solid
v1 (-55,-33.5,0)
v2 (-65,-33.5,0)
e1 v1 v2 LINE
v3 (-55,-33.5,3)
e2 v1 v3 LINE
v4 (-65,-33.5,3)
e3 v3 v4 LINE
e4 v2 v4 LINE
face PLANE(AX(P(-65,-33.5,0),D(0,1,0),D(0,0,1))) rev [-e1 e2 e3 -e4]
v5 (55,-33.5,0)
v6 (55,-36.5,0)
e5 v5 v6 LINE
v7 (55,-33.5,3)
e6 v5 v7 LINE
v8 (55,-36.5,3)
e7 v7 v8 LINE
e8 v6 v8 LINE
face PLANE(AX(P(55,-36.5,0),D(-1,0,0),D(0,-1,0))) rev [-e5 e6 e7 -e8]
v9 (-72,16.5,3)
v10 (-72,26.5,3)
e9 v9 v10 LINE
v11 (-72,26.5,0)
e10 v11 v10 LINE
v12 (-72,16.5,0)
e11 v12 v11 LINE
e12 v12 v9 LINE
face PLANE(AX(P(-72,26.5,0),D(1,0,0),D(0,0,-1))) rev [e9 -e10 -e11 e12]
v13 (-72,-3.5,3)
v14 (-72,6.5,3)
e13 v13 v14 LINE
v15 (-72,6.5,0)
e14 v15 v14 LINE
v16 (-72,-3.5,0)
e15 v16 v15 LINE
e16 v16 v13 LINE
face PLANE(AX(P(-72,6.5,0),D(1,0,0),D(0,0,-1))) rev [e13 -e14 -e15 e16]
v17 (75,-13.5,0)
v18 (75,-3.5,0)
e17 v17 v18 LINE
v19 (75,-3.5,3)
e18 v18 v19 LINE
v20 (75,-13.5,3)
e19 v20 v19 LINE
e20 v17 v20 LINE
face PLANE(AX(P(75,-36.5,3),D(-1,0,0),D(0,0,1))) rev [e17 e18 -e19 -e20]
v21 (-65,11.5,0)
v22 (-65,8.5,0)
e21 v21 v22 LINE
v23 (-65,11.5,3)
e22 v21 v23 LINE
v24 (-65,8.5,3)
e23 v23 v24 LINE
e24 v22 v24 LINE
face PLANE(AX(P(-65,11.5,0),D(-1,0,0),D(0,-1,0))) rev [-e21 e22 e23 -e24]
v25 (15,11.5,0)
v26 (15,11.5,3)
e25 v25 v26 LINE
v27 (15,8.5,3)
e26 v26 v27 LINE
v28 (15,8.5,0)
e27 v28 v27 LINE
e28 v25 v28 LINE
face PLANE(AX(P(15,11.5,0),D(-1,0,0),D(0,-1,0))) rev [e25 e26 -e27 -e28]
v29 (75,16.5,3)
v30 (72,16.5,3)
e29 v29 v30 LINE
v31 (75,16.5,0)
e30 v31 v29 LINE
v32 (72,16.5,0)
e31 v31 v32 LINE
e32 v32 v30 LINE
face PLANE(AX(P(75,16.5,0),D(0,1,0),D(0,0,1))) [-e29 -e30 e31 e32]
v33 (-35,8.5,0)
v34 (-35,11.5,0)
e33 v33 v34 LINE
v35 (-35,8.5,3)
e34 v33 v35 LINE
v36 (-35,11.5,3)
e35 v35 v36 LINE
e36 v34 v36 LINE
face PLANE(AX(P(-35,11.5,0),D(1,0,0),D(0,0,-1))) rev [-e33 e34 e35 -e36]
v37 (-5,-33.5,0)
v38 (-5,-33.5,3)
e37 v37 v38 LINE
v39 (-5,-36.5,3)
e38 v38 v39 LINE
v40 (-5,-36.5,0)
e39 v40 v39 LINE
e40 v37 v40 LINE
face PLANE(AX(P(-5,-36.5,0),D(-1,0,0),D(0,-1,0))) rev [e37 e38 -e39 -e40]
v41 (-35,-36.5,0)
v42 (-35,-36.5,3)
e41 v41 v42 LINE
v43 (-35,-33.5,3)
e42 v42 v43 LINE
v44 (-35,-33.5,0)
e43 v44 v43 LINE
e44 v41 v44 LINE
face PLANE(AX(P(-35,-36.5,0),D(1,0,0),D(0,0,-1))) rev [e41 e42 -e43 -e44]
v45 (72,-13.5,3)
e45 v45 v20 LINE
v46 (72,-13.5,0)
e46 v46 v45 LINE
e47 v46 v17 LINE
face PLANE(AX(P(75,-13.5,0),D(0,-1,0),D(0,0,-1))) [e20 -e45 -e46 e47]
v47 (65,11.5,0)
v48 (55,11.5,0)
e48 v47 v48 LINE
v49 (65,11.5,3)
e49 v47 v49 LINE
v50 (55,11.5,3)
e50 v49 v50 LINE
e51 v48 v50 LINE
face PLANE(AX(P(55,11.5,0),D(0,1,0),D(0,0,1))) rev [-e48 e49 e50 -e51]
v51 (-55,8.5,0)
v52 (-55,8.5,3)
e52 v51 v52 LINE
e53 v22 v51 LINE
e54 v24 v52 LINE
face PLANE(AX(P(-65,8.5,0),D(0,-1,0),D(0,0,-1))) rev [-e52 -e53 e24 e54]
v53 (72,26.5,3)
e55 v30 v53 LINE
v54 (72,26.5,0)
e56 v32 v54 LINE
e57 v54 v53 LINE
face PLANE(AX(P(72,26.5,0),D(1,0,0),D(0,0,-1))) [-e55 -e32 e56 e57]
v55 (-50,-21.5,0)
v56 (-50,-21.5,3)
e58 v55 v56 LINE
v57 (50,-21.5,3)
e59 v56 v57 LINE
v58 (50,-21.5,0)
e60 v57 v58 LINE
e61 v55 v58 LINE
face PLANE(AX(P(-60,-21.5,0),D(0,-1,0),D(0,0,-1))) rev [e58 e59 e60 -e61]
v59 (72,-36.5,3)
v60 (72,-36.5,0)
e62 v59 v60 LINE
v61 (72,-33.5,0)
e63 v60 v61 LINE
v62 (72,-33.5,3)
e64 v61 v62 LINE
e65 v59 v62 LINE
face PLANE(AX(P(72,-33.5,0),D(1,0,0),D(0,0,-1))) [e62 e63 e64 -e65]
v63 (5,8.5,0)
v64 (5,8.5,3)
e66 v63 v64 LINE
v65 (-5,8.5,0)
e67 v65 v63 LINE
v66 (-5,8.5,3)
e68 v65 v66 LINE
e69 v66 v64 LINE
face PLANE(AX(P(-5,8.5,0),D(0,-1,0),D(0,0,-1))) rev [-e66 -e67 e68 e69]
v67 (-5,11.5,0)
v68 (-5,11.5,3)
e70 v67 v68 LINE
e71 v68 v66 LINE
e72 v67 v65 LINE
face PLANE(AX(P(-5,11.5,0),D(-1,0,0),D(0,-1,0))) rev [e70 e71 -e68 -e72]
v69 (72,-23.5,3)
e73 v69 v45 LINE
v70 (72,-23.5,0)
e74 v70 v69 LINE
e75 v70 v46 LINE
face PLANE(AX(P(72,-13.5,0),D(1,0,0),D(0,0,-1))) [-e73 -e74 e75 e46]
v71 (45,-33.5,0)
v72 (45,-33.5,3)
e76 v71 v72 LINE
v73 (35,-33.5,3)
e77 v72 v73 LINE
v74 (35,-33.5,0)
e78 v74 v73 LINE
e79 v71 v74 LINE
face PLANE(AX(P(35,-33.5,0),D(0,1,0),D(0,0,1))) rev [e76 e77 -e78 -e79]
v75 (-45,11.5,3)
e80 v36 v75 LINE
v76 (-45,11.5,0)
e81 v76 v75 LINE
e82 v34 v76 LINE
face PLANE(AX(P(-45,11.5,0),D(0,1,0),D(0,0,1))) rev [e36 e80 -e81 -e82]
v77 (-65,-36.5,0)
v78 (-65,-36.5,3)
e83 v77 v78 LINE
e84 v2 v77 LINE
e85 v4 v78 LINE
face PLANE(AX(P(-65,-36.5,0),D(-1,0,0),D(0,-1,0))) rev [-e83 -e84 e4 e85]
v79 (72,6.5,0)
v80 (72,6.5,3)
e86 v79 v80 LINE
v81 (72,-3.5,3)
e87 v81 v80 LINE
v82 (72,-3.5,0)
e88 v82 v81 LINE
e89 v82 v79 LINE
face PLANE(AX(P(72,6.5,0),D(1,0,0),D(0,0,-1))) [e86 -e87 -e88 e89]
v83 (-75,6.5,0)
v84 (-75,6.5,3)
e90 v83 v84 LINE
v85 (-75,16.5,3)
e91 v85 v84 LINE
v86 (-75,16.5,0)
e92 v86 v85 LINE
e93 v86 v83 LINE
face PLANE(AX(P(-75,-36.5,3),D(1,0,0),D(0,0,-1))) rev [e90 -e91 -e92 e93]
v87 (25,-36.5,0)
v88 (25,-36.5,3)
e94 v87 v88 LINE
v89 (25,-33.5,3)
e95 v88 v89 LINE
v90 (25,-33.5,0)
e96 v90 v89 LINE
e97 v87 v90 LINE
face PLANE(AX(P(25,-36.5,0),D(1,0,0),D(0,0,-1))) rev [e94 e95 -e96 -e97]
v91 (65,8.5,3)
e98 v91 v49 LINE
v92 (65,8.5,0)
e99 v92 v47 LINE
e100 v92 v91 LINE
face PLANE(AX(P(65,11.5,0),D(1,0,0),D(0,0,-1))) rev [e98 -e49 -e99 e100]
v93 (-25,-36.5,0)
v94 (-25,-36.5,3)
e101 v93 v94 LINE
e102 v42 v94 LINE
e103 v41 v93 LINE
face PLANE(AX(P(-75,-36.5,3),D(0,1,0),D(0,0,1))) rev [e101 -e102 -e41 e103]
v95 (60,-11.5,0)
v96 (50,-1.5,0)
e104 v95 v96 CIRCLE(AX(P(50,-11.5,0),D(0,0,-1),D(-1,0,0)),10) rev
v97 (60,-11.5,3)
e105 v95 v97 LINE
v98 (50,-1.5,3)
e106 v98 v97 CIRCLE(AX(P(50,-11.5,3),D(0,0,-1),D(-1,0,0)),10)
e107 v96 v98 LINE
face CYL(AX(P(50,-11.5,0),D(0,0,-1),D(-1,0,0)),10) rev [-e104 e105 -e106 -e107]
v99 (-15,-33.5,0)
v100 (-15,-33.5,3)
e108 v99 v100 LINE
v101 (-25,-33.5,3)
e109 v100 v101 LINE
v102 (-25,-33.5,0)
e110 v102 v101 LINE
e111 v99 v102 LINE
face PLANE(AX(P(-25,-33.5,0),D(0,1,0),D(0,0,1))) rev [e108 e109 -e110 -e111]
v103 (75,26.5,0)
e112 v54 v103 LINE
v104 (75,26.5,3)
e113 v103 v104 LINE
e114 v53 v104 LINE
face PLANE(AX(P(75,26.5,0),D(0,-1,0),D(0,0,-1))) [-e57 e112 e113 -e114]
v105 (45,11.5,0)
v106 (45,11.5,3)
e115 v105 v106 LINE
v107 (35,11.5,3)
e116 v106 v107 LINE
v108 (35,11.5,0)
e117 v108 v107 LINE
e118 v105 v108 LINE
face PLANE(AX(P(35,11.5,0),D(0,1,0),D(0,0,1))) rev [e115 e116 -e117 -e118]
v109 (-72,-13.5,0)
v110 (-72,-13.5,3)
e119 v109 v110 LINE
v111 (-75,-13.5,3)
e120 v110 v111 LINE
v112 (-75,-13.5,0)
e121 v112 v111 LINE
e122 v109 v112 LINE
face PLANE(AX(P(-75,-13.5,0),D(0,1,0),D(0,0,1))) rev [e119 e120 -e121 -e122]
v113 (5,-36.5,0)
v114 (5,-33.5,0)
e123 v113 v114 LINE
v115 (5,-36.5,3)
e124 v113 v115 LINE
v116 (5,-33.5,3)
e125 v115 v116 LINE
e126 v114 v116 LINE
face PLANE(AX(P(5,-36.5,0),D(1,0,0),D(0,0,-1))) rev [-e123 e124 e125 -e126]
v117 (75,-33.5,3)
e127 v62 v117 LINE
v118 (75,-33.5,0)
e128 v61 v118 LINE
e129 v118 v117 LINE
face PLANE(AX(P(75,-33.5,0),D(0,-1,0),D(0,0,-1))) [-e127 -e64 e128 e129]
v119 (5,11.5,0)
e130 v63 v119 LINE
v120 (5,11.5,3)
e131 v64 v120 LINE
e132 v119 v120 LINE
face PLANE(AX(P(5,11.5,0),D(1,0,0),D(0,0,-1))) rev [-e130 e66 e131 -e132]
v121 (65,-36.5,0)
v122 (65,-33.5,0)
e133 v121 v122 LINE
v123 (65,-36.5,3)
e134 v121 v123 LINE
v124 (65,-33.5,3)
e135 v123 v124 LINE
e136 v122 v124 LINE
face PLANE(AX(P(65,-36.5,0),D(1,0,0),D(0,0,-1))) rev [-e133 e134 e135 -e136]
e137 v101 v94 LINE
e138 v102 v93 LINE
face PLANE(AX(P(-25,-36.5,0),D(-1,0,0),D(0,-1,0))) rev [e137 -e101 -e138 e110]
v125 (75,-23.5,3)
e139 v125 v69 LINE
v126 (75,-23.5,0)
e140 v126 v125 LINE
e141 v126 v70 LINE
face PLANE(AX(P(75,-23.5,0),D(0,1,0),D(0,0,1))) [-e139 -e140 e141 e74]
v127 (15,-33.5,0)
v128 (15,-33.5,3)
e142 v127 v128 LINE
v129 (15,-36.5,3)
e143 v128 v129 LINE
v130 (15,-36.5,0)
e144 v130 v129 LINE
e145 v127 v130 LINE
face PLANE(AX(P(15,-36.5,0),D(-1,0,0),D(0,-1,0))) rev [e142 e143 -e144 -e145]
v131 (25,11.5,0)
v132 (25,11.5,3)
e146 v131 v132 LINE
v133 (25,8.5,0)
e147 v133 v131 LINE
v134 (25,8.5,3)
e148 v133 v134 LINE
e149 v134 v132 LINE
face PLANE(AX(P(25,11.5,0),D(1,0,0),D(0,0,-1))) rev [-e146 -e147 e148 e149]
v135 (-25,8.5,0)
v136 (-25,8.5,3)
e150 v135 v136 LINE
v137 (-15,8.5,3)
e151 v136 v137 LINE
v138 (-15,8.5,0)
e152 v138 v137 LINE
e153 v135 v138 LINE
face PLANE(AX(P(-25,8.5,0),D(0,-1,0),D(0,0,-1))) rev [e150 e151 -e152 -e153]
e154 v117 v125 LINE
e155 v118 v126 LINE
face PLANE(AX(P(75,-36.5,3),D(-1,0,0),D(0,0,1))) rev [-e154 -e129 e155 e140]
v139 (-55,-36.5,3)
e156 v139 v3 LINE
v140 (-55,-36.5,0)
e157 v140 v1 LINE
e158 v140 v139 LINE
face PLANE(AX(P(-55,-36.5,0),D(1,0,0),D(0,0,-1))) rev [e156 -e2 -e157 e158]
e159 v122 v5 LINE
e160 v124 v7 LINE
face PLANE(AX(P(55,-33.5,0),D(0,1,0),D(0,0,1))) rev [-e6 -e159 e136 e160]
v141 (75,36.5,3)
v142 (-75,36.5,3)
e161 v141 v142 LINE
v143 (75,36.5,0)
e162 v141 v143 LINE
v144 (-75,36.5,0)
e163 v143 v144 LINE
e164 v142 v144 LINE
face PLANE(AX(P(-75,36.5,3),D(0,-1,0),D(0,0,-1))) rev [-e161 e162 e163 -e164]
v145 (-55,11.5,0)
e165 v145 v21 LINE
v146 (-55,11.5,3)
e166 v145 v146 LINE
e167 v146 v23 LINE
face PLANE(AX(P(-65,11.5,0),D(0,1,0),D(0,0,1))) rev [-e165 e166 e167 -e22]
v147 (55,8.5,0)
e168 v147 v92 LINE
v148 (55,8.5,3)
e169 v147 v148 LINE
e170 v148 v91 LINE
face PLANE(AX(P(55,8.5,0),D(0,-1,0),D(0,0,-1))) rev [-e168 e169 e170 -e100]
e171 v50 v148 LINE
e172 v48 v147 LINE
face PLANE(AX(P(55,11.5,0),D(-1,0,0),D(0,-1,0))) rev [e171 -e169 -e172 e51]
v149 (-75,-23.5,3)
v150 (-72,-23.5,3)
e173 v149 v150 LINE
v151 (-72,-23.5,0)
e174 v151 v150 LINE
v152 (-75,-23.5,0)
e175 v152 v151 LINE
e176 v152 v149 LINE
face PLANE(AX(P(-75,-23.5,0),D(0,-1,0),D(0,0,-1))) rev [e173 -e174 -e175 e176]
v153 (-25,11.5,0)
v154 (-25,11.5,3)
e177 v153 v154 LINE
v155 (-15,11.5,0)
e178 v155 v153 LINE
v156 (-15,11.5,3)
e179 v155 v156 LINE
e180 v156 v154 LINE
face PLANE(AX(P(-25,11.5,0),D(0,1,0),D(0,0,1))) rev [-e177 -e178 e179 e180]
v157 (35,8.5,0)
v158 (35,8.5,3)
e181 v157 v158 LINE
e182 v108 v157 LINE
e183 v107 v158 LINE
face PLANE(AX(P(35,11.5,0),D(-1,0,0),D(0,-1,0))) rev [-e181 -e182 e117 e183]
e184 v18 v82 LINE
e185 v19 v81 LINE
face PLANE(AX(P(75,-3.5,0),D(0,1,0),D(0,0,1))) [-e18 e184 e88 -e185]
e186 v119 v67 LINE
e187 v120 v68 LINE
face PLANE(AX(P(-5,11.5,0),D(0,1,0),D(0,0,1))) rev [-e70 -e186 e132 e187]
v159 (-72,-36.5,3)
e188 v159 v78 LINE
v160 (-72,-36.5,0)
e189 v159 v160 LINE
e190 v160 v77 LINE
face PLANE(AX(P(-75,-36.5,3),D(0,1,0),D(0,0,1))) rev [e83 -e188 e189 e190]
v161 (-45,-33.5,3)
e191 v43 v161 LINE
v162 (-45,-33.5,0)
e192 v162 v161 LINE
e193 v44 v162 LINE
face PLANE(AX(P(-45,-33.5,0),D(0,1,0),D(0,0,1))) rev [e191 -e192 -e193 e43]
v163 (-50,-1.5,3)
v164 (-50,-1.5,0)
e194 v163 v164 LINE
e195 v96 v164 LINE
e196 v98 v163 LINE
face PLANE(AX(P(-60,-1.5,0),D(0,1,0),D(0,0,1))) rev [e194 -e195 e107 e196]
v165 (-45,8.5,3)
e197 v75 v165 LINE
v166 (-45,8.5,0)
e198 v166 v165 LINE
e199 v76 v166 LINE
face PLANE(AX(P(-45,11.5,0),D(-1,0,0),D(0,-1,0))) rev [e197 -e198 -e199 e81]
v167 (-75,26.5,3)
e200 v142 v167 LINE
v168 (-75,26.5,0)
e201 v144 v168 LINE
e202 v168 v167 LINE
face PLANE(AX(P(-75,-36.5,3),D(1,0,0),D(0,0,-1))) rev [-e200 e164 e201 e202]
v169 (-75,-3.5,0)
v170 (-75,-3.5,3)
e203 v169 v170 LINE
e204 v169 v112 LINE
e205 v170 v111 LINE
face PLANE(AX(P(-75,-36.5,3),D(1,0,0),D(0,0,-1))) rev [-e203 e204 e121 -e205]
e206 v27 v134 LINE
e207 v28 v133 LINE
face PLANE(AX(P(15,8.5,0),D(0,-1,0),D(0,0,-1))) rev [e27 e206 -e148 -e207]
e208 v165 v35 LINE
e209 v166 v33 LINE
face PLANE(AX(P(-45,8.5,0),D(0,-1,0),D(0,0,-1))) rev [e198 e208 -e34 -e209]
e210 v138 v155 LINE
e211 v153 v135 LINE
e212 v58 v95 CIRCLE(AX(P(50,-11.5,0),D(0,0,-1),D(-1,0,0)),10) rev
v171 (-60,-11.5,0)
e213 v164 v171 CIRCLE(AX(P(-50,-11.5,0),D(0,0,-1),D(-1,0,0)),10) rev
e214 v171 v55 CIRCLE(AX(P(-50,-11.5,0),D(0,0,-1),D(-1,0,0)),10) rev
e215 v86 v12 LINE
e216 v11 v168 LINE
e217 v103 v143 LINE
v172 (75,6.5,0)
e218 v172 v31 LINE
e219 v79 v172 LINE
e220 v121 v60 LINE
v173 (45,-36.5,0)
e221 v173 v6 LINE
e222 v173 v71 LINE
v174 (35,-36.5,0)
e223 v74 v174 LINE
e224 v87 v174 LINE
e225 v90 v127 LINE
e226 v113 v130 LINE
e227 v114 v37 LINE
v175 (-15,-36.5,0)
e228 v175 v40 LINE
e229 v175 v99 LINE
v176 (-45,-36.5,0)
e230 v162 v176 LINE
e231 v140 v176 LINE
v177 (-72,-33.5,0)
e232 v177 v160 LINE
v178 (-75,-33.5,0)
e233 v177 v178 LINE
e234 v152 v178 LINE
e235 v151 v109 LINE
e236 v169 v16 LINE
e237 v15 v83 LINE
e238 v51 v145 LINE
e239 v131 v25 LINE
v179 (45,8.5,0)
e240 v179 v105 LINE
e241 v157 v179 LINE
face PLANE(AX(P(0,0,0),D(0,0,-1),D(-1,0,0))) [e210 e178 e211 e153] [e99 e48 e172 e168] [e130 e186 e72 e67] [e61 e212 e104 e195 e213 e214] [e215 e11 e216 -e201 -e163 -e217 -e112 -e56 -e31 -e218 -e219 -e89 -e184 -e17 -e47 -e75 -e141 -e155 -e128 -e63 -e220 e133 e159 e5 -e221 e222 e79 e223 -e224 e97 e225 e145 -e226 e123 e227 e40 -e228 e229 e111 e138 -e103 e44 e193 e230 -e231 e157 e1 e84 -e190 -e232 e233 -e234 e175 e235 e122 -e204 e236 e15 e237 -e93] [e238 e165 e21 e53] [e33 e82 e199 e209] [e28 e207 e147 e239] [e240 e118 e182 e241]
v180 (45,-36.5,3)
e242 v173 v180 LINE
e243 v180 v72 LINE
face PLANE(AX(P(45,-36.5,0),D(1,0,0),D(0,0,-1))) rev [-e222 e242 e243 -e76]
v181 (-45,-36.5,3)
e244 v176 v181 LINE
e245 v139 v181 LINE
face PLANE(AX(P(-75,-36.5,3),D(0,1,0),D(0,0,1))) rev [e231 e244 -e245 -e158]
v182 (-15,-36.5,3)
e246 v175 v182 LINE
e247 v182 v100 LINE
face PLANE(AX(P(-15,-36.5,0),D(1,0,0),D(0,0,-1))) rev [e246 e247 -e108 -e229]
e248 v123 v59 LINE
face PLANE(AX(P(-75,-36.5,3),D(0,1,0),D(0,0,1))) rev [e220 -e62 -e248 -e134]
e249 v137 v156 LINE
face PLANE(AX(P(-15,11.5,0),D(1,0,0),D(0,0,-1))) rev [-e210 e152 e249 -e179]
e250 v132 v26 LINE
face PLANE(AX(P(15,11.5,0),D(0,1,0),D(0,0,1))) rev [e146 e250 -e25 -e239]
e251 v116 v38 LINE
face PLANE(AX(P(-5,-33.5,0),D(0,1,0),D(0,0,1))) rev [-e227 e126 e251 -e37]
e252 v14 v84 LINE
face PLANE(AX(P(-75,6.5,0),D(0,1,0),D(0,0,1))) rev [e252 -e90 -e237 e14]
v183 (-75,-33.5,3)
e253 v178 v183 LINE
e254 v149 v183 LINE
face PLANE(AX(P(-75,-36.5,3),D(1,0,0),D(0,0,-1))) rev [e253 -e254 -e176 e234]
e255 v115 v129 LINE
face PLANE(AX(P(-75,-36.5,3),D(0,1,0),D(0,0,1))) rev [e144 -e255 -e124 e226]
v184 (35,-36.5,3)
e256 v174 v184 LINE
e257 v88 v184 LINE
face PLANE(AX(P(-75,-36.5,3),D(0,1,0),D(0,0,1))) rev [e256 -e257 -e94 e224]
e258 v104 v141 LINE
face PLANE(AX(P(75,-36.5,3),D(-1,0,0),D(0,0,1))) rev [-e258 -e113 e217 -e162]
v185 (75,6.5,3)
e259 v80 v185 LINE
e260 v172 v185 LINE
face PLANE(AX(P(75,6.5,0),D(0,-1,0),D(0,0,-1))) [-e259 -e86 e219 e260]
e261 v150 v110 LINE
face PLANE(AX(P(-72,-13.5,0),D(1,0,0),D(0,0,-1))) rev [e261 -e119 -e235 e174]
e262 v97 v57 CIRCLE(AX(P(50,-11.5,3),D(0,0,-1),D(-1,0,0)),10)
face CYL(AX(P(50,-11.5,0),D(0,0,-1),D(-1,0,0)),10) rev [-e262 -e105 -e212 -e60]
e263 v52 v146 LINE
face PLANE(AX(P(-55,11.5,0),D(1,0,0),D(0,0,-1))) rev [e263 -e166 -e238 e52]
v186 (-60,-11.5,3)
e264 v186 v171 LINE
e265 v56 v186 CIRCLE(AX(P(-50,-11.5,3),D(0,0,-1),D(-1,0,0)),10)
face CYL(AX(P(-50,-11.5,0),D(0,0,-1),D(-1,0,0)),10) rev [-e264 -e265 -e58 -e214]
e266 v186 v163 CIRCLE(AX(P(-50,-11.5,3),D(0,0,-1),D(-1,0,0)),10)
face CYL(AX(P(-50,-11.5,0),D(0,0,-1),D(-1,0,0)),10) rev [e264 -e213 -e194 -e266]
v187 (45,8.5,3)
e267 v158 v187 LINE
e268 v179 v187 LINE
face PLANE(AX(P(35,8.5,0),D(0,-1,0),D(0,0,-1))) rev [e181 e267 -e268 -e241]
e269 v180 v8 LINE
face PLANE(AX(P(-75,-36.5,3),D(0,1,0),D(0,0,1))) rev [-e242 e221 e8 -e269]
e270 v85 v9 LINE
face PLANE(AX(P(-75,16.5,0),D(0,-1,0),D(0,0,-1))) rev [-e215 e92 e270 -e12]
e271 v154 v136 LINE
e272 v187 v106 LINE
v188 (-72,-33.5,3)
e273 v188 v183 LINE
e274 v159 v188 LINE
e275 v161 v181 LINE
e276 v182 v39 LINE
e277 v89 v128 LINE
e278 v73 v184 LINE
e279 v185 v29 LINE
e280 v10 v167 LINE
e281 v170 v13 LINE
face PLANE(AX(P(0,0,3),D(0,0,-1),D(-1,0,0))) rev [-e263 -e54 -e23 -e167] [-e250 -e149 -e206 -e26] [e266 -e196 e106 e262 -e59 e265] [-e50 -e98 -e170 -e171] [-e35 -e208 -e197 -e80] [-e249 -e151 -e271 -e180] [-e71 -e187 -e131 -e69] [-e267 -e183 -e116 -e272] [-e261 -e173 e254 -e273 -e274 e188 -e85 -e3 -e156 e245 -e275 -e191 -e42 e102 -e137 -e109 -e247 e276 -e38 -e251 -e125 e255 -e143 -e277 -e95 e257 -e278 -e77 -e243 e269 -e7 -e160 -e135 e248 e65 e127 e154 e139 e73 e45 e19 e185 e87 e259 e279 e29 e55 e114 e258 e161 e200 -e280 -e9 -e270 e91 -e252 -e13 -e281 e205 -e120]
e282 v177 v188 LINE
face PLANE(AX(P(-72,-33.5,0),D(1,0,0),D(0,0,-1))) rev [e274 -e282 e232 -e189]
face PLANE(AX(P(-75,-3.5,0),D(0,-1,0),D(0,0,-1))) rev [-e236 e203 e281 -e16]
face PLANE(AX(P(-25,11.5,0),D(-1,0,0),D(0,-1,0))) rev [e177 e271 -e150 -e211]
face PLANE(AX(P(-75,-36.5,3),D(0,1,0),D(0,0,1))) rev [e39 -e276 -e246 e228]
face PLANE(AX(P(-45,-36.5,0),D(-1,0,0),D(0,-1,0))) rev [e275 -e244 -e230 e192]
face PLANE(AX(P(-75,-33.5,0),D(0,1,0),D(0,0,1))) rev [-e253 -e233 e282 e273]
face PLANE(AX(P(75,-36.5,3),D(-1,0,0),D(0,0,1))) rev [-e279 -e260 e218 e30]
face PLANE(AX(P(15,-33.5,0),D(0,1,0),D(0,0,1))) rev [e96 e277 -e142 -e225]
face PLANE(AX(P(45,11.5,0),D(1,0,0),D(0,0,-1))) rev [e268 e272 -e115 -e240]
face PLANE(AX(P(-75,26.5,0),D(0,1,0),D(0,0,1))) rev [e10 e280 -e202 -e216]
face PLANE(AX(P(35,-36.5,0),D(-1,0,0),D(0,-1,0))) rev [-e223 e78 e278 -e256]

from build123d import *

# Parameters (mm, degrees)
SKETCH1_W               = 150
SKETCH1_H               = 73
BOSS_EXTRUDE1_DEPTH     = 3
SKETCH2_W               = 3
SKETCH2_H               = 10
CUT_EXTRUDE1_DEPTH      = 84.464064123
LPATTERN1_COUNT         = 4
LPATTERN1_PITCH         = 20
MIRROR3_COPY_1_SKETCH_W = 3
MIRROR3_COPY_1_SKETCH_H = 10
MIRROR3_COPY_1_DEPTH    = 84.464064123
MIRROR3_COPY_2_SKETCH_W = 3
MIRROR3_COPY_2_SKETCH_H = 10
MIRROR3_COPY_2_DEPTH    = 84.464064123
MIRROR3_COPY_3_SKETCH_W = 3
MIRROR3_COPY_3_SKETCH_H = 10
MIRROR3_COPY_3_DEPTH    = 84.464064123
SKETCH4_W               = 10
SKETCH4_H               = 3
CUT_EXTRUDE3_DEPTH      = 84.464064123
LPATTERN2_COUNT         = 8
LPATTERN2_PITCH         = 20
SKETCH5_W               = 10
SKETCH5_H               = 3
CUT_EXTRUDE4_DEPTH      = 84.464064123
LPATTERN4_COUNT         = 7
LPATTERN4_PITCH         = 20
SKETCH6_W               = 120
SKETCH6_H               = 20
CUT_EXTRUDE5_DEPTH      = 84.464064123
FILLET1_R               = 10


with BuildPart() as part:
    # Sketch1 → Boss-Extrude1 (new body)
    with BuildSketch(Plane.XY):
        Rectangle(SKETCH1_W, SKETCH1_H)
    extrude(amount=BOSS_EXTRUDE1_DEPTH)

    # Sketch2 → Cut-Extrude1 (cut, through all)
    with BuildSketch(Plane.XY.offset(3)):
        with Locations((-73.5, 21.5)):
            Rectangle(SKETCH2_W, SKETCH2_H)
    cut_extrude1 = extrude(amount=-CUT_EXTRUDE1_DEPTH, mode=Mode.SUBTRACT)

    # LPattern1: Cut-Extrude1 ×4
    with Locations(*[(0, -i * LPATTERN1_PITCH, 0) for i in range(1, LPATTERN1_COUNT)]):
        add(cut_extrude1, mode=Mode.SUBTRACT)

    # Mirror3: Cut-Extrude1 across plane
    add(cut_extrude1.mirror(Plane(origin=(0, 0, 0), x_dir=(0, 0, 1), z_dir=(1, 0, 0))), mode=Mode.SUBTRACT)

    # Mirror3 copy 1 sketch → Mirror3 copy 1 (cut, through all)
    with BuildSketch(Plane(origin=(0, -20, 3), x_dir=(-1, 0, 0), z_dir=(0, 0, 1))):
        with Locations((-73.5, -21.5)):
            Rectangle(MIRROR3_COPY_1_SKETCH_W, MIRROR3_COPY_1_SKETCH_H)
    extrude(amount=-MIRROR3_COPY_1_DEPTH, mode=Mode.SUBTRACT)

    # Mirror3 copy 2 sketch → Mirror3 copy 2 (cut, through all)
    with BuildSketch(Plane(origin=(0, -40, 3), x_dir=(-1, 0, 0), z_dir=(0, 0, 1))):
        with Locations((-73.5, -21.5)):
            Rectangle(MIRROR3_COPY_2_SKETCH_W, MIRROR3_COPY_2_SKETCH_H)
    extrude(amount=-MIRROR3_COPY_2_DEPTH, mode=Mode.SUBTRACT)

    # Mirror3 copy 3 sketch → Mirror3 copy 3 (cut, through all)
    with BuildSketch(Plane(origin=(0, -60, 3), x_dir=(-1, 0, 0), z_dir=(0, 0, 1))):
        with Locations((-73.5, -21.5)):
            Rectangle(MIRROR3_COPY_3_SKETCH_W, MIRROR3_COPY_3_SKETCH_H)
    extrude(amount=-MIRROR3_COPY_3_DEPTH, mode=Mode.SUBTRACT)

    # Sketch4 → Cut-Extrude3 (cut, through all)
    with BuildSketch(Plane.XY.offset(3)):
        with Locations((60, -35)):
            Rectangle(SKETCH4_W, SKETCH4_H)
    cut_extrude3 = extrude(amount=-CUT_EXTRUDE3_DEPTH, mode=Mode.SUBTRACT)

    # LPattern2: Cut-Extrude3 ×8
    with Locations(*[(-i * LPATTERN2_PITCH, 0, 0) for i in range(1, LPATTERN2_COUNT)]):
        add(cut_extrude3, mode=Mode.SUBTRACT)

    # Sketch5 → Cut-Extrude4 (cut, through all)
    with BuildSketch(Plane.XY.offset(3)):
        with Locations((-60, 10)):
            Rectangle(SKETCH5_W, SKETCH5_H)
    cut_extrude4 = extrude(amount=-CUT_EXTRUDE4_DEPTH, mode=Mode.SUBTRACT)

    # LPattern4: Cut-Extrude4 ×7
    with Locations(*[(i * LPATTERN4_PITCH, 0, 0) for i in range(1, LPATTERN4_COUNT)]):
        add(cut_extrude4, mode=Mode.SUBTRACT)

    # Sketch6 → Cut-Extrude5 (cut, through all)
    with BuildSketch(Plane.XY.offset(3)):
        with Locations((0, -11.5)):
            Rectangle(SKETCH6_W, SKETCH6_H)
    extrude(amount=-CUT_EXTRUDE5_DEPTH, mode=Mode.SUBTRACT)

    # Fillet1
    fillet1_edges = [part.edges().sort_by_distance(p)[0] for p in [
        (60, -1.5, 1.5),
        (60, -21.5, 1.5),
        (-60, -1.5, 1.5),
        (-60, -21.5, 1.5),
    ]]
    fillet(fillet1_edges, radius=FILLET1_R - 0.0001)  # a hair under: the kernel refuses the full size


solid = part.part
